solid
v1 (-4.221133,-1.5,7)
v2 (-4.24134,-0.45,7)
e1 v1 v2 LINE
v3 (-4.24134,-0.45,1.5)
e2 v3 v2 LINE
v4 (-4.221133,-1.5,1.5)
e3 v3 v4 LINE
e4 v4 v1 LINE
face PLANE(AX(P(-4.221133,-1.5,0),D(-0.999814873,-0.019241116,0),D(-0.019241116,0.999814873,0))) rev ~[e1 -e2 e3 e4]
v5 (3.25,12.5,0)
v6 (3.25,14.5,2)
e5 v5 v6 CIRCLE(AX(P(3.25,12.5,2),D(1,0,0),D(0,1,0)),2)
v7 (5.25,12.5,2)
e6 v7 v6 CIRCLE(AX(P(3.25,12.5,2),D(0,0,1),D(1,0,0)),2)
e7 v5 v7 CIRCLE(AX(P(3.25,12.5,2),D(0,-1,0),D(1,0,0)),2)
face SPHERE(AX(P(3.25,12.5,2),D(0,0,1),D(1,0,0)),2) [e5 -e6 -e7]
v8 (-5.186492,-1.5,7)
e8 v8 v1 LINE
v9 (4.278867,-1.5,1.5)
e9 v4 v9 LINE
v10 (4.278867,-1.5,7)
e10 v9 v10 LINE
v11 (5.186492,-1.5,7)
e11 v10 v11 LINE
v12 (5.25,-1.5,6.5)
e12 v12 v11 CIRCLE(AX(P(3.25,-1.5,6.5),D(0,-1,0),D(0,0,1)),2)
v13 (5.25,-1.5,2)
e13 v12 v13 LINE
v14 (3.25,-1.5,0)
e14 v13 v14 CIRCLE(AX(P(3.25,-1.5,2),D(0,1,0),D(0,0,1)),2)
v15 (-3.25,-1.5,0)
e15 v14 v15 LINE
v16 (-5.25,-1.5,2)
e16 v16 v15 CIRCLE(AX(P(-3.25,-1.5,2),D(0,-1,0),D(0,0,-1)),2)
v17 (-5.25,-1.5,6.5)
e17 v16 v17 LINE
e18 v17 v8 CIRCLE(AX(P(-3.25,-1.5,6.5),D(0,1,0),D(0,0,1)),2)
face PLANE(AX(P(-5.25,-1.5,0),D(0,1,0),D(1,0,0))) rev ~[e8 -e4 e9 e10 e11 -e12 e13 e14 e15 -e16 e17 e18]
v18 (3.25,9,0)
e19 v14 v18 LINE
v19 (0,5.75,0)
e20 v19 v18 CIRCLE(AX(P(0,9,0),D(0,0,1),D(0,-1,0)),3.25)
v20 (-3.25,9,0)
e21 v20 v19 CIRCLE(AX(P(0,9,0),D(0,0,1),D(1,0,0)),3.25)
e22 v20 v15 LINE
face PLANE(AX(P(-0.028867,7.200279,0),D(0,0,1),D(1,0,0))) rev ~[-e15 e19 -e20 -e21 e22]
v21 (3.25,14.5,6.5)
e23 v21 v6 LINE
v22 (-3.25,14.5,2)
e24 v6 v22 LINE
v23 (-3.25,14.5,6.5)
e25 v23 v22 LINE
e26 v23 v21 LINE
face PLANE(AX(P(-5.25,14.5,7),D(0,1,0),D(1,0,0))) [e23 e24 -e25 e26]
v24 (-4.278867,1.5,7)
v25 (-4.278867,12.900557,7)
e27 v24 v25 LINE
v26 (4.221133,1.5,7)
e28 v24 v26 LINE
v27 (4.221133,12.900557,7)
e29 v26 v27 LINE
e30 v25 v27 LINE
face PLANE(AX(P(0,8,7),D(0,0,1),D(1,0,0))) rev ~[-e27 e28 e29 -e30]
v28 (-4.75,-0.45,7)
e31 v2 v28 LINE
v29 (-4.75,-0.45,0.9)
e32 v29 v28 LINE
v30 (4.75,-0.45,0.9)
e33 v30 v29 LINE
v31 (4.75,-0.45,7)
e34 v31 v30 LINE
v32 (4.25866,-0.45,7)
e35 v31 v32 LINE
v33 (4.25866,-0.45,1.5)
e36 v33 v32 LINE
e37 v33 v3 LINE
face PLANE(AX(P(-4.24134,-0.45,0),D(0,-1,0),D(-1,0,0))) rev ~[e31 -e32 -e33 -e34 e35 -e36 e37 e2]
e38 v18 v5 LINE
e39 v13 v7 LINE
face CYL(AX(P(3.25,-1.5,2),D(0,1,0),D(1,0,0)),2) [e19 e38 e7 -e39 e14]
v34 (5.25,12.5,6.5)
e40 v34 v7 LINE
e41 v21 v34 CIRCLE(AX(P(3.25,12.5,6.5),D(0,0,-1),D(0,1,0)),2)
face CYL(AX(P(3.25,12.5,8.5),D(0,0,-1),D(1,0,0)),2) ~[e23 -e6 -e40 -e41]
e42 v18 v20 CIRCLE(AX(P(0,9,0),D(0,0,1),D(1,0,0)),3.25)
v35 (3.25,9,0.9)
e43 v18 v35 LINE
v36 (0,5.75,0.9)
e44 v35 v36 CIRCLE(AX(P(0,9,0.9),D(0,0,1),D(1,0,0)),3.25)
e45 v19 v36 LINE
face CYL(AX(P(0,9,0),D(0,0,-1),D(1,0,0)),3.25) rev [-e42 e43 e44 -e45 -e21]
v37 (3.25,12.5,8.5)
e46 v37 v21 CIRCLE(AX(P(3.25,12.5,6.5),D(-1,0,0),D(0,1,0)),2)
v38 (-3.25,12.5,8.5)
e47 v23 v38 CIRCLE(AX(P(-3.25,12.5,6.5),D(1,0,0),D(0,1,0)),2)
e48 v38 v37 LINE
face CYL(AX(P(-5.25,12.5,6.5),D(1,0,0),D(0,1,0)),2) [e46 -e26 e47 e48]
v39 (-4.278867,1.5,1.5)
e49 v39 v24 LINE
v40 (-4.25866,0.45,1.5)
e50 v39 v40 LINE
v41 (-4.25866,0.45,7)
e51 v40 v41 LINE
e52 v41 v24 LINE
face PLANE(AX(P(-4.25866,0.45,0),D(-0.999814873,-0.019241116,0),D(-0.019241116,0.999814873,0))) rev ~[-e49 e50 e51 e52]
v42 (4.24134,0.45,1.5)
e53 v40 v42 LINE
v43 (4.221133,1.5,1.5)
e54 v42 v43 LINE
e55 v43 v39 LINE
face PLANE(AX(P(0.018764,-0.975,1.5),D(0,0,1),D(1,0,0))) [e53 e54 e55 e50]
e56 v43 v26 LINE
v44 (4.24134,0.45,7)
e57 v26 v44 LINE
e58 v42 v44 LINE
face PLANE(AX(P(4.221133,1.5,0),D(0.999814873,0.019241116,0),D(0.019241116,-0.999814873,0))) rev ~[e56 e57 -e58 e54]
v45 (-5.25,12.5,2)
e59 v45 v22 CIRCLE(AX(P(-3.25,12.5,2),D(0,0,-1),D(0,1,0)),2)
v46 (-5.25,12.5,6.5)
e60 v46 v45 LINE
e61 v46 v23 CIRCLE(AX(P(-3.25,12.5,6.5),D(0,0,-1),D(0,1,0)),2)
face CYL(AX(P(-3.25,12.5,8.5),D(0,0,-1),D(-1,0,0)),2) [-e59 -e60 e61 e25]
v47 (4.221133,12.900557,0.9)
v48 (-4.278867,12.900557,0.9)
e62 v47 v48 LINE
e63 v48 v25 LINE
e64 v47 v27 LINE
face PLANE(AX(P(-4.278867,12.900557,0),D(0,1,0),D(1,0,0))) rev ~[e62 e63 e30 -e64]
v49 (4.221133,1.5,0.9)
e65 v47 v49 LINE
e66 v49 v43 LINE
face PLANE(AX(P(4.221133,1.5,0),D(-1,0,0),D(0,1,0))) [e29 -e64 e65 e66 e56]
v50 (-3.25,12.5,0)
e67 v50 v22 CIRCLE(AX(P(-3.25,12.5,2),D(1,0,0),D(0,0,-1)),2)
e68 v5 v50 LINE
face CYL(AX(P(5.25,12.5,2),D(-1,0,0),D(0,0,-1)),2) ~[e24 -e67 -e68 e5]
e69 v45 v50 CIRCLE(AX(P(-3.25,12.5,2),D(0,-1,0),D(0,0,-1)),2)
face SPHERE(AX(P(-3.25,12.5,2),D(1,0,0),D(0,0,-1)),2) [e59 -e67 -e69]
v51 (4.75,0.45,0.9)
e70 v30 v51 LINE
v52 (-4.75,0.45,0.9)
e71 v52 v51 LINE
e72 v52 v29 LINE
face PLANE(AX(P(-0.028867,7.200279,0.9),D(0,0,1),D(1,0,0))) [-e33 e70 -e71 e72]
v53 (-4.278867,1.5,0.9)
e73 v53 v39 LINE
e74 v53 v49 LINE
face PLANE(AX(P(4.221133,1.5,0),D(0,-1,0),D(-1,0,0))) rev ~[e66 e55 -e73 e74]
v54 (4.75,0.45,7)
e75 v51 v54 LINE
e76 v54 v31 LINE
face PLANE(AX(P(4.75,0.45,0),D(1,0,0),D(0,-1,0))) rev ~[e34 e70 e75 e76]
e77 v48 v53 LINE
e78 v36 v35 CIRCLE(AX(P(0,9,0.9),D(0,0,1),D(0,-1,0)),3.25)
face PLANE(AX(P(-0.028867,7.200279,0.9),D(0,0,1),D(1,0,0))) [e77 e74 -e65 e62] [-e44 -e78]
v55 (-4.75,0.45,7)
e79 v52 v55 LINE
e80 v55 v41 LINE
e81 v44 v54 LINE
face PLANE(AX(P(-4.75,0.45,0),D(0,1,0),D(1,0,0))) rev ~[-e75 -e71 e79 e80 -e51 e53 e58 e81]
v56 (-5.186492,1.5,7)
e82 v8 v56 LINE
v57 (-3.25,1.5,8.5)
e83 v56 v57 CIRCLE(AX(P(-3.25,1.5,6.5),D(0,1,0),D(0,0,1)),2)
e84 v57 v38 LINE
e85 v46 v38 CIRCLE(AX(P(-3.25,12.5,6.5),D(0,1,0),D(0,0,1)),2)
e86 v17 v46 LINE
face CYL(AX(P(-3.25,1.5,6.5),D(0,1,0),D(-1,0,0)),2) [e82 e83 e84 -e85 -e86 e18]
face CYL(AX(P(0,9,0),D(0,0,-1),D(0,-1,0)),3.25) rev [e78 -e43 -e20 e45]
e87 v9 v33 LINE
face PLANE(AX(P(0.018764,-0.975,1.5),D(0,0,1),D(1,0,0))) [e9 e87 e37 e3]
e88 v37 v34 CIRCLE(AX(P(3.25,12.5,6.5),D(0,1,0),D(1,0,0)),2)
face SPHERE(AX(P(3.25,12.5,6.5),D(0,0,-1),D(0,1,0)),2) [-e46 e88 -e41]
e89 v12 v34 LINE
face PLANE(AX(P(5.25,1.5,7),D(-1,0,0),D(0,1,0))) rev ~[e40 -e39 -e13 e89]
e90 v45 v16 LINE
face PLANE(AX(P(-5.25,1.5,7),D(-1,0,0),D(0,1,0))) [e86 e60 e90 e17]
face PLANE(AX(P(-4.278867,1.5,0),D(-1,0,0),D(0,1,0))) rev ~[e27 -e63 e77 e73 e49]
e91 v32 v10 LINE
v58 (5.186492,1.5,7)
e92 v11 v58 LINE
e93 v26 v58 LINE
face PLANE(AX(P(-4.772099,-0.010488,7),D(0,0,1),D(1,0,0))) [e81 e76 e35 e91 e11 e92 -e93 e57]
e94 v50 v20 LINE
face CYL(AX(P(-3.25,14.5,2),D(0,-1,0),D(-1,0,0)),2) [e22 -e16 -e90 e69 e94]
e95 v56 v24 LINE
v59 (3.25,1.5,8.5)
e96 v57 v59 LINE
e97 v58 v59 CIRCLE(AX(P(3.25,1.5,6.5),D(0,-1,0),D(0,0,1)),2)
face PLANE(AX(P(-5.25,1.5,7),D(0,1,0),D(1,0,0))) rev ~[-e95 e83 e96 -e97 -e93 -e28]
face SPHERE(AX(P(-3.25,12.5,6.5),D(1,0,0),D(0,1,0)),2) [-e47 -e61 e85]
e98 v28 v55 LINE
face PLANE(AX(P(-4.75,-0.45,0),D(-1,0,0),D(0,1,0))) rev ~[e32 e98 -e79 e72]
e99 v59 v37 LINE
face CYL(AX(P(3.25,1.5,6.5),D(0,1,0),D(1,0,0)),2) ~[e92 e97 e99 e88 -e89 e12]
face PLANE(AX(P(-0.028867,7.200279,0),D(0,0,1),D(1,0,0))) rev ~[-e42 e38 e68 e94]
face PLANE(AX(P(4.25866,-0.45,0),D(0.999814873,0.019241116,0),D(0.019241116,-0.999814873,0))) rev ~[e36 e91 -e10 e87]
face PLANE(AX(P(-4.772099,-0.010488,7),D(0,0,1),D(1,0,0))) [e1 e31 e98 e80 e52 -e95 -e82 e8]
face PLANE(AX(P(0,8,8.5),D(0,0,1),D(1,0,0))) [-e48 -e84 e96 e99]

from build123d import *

# Parameters (mm, degrees)
F0_W     = 8.5
F0_H     = 11.400557369
F0_W_2   = 0.9711329822
F0_H_2   = 1.599442631
F0_W_3   = 1.0288670178
F1_DEPTH = 0.9
F2_DEPTH = 1.5
F3_DEPTH = 7
F5_W     = 10.5
F5_H     = 13
F6_DEPTH = 1.5
F7_R     = 2
F9_DEPTH = 0.9


# Not quite as in the source:
# - a feature names something its author has since deleted; it is built from what else it names


with BuildPart() as f1:
    # F0 (on Top) → F1 (new body)
    with BuildSketch(Plane.XY):
        with Locations((-0.0288670178, 7.2002786845)):
            Rectangle(F0_W, F0_H)
        Polygon((-5.25, 1.5), (-5.25, -1.5), (-4.2211329822, -1.5), (-4.2413398946, -0.45), (-4.75, -0.45), (-4.75, 0.45), (-4.2586601054, 0.45), (-4.2788670178, 1.5), align=None)
        Polygon((4.2211329822, 1.5), (-4.2788670178, 1.5), (-4.2586601054, 0.45), (4.2413398946, 0.45), align=None)
        with Locations((-4.7644335089, 7.2002786845)):
            Rectangle(F0_W_2, F0_H)
        Polygon((4.2586601054, -0.45), (4.2788670178, -1.5), (5.25, -1.5), (5.25, 1.5), (4.2211329822, 1.5), (4.2413398946, 0.45), (4.75, 0.45), (4.75, -0.45), align=None)
        Polygon((-4.2413398946, -0.45), (-4.2211329822, -1.5), (4.2788670178, -1.5), (4.2586601054, -0.45), align=None)
        Polygon((-4.2586601054, 0.45), (-4.2413398946, -0.45), (4.2586601054, -0.45), (4.2413398946, 0.45), align=None)
        Polygon((-4.75, -0.45), (-4.2413398946, -0.45), (-4.2586601054, 0.45), (-4.75, 0.45), align=None)
        Polygon((4.2413398946, 0.45), (4.2586601054, -0.45), (4.75, -0.45), (4.75, 0.45), align=None)
        with Locations((-4.7644335089, 13.7002786845)):
            Rectangle(F0_W_2, F0_H_2)
        with Locations((-0.0288670178, 13.7002786845)):
            Rectangle(F0_W, F0_H_2)
        with Locations((4.7355664911, 13.7002786845)):
            Rectangle(F0_W_3, F0_H_2)
        with Locations((4.7355664911, 7.2002786845)):
            Rectangle(F0_W_3, F0_H)
    extrude(amount=F1_DEPTH)

    # F0 (on Top) → F2 (join)
    with BuildSketch(Plane.XY):
        Polygon((-4.2413398946, -0.45), (-4.2211329822, -1.5), (4.2788670178, -1.5), (4.2586601054, -0.45), align=None)
        Polygon((-5.25, 1.5), (-5.25, -1.5), (-4.2211329822, -1.5), (-4.2413398946, -0.45), (-4.75, -0.45), (-4.75, 0.45), (-4.2586601054, 0.45), (-4.2788670178, 1.5), align=None)
        Polygon((4.2586601054, -0.45), (4.2788670178, -1.5), (5.25, -1.5), (5.25, 1.5), (4.2211329822, 1.5), (4.2413398946, 0.45), (4.75, 0.45), (4.75, -0.45), align=None)
        Polygon((4.2211329822, 1.5), (-4.2788670178, 1.5), (-4.2586601054, 0.45), (4.2413398946, 0.45), align=None)
        with Locations((-4.7644335089, 7.2002786845)):
            Rectangle(F0_W_2, F0_H)
        with Locations((-4.7644335089, 13.7002786845)):
            Rectangle(F0_W_2, F0_H_2)
        with Locations((-0.0288670178, 13.7002786845)):
            Rectangle(F0_W, F0_H_2)
        with Locations((4.7355664911, 13.7002786845)):
            Rectangle(F0_W_3, F0_H_2)
        with Locations((4.7355664911, 7.2002786845)):
            Rectangle(F0_W_3, F0_H)
    extrude(amount=F2_DEPTH)

    # F0 (on Top) → F3 (join)
    with BuildSketch(Plane.XY):
        Polygon((-5.25, 1.5), (-5.25, -1.5), (-4.2211329822, -1.5), (-4.2413398946, -0.45), (-4.75, -0.45), (-4.75, 0.45), (-4.2586601054, 0.45), (-4.2788670178, 1.5), align=None)
        Polygon((4.2586601054, -0.45), (4.2788670178, -1.5), (5.25, -1.5), (5.25, 1.5), (4.2211329822, 1.5), (4.2413398946, 0.45), (4.75, 0.45), (4.75, -0.45), align=None)
        with Locations((-4.7644335089, 13.7002786845)):
            Rectangle(F0_W_2, F0_H_2)
        with Locations((-0.0288670178, 13.7002786845)):
            Rectangle(F0_W, F0_H_2)
        with Locations((4.7355664911, 13.7002786845)):
            Rectangle(F0_W_3, F0_H_2)
        with Locations((-4.7644335089, 7.2002786845)):
            Rectangle(F0_W_2, F0_H)
        with Locations((4.7355664911, 7.2002786845)):
            Rectangle(F0_W_3, F0_H)
    extrude(amount=F3_DEPTH)

    # F5 (on offset) → F6 (join)
    with BuildSketch(Plane.XY.offset(7)):
        with Locations((0, 8)):
            Rectangle(F5_W, F5_H)
    extrude(amount=F6_DEPTH)

    # F7
    f7_edges = [f1.edges().sort_by_distance(p)[0] for p in [
        (5.25, 14.5, 4.25),
        (0, 14.5, 8.5),
        (5.25, 8, 8.5),
        (5.25, 6.5, 0),
        (0, 14.5, 0),
        (-5.25, 6.5, 0),
        (-5.25, 14.5, 4.25),
        (-5.25, 8, 8.5),
    ]]
    fillet(f7_edges, radius=F7_R)

    # F8 (on Top) → F9 (cut, through all)
    with BuildSketch(Plane.XY):
        with BuildLine():
            ThreePointArc((0, 5.75), (2.2980970389, 6.7019029611), (3.25, 9))
            ThreePointArc((3.25, 9), (-2.2980970389, 11.2980970389), (0, 5.75))
        make_face()
    extrude(amount=F9_DEPTH, mode=Mode.SUBTRACT)


solid = f1.part
